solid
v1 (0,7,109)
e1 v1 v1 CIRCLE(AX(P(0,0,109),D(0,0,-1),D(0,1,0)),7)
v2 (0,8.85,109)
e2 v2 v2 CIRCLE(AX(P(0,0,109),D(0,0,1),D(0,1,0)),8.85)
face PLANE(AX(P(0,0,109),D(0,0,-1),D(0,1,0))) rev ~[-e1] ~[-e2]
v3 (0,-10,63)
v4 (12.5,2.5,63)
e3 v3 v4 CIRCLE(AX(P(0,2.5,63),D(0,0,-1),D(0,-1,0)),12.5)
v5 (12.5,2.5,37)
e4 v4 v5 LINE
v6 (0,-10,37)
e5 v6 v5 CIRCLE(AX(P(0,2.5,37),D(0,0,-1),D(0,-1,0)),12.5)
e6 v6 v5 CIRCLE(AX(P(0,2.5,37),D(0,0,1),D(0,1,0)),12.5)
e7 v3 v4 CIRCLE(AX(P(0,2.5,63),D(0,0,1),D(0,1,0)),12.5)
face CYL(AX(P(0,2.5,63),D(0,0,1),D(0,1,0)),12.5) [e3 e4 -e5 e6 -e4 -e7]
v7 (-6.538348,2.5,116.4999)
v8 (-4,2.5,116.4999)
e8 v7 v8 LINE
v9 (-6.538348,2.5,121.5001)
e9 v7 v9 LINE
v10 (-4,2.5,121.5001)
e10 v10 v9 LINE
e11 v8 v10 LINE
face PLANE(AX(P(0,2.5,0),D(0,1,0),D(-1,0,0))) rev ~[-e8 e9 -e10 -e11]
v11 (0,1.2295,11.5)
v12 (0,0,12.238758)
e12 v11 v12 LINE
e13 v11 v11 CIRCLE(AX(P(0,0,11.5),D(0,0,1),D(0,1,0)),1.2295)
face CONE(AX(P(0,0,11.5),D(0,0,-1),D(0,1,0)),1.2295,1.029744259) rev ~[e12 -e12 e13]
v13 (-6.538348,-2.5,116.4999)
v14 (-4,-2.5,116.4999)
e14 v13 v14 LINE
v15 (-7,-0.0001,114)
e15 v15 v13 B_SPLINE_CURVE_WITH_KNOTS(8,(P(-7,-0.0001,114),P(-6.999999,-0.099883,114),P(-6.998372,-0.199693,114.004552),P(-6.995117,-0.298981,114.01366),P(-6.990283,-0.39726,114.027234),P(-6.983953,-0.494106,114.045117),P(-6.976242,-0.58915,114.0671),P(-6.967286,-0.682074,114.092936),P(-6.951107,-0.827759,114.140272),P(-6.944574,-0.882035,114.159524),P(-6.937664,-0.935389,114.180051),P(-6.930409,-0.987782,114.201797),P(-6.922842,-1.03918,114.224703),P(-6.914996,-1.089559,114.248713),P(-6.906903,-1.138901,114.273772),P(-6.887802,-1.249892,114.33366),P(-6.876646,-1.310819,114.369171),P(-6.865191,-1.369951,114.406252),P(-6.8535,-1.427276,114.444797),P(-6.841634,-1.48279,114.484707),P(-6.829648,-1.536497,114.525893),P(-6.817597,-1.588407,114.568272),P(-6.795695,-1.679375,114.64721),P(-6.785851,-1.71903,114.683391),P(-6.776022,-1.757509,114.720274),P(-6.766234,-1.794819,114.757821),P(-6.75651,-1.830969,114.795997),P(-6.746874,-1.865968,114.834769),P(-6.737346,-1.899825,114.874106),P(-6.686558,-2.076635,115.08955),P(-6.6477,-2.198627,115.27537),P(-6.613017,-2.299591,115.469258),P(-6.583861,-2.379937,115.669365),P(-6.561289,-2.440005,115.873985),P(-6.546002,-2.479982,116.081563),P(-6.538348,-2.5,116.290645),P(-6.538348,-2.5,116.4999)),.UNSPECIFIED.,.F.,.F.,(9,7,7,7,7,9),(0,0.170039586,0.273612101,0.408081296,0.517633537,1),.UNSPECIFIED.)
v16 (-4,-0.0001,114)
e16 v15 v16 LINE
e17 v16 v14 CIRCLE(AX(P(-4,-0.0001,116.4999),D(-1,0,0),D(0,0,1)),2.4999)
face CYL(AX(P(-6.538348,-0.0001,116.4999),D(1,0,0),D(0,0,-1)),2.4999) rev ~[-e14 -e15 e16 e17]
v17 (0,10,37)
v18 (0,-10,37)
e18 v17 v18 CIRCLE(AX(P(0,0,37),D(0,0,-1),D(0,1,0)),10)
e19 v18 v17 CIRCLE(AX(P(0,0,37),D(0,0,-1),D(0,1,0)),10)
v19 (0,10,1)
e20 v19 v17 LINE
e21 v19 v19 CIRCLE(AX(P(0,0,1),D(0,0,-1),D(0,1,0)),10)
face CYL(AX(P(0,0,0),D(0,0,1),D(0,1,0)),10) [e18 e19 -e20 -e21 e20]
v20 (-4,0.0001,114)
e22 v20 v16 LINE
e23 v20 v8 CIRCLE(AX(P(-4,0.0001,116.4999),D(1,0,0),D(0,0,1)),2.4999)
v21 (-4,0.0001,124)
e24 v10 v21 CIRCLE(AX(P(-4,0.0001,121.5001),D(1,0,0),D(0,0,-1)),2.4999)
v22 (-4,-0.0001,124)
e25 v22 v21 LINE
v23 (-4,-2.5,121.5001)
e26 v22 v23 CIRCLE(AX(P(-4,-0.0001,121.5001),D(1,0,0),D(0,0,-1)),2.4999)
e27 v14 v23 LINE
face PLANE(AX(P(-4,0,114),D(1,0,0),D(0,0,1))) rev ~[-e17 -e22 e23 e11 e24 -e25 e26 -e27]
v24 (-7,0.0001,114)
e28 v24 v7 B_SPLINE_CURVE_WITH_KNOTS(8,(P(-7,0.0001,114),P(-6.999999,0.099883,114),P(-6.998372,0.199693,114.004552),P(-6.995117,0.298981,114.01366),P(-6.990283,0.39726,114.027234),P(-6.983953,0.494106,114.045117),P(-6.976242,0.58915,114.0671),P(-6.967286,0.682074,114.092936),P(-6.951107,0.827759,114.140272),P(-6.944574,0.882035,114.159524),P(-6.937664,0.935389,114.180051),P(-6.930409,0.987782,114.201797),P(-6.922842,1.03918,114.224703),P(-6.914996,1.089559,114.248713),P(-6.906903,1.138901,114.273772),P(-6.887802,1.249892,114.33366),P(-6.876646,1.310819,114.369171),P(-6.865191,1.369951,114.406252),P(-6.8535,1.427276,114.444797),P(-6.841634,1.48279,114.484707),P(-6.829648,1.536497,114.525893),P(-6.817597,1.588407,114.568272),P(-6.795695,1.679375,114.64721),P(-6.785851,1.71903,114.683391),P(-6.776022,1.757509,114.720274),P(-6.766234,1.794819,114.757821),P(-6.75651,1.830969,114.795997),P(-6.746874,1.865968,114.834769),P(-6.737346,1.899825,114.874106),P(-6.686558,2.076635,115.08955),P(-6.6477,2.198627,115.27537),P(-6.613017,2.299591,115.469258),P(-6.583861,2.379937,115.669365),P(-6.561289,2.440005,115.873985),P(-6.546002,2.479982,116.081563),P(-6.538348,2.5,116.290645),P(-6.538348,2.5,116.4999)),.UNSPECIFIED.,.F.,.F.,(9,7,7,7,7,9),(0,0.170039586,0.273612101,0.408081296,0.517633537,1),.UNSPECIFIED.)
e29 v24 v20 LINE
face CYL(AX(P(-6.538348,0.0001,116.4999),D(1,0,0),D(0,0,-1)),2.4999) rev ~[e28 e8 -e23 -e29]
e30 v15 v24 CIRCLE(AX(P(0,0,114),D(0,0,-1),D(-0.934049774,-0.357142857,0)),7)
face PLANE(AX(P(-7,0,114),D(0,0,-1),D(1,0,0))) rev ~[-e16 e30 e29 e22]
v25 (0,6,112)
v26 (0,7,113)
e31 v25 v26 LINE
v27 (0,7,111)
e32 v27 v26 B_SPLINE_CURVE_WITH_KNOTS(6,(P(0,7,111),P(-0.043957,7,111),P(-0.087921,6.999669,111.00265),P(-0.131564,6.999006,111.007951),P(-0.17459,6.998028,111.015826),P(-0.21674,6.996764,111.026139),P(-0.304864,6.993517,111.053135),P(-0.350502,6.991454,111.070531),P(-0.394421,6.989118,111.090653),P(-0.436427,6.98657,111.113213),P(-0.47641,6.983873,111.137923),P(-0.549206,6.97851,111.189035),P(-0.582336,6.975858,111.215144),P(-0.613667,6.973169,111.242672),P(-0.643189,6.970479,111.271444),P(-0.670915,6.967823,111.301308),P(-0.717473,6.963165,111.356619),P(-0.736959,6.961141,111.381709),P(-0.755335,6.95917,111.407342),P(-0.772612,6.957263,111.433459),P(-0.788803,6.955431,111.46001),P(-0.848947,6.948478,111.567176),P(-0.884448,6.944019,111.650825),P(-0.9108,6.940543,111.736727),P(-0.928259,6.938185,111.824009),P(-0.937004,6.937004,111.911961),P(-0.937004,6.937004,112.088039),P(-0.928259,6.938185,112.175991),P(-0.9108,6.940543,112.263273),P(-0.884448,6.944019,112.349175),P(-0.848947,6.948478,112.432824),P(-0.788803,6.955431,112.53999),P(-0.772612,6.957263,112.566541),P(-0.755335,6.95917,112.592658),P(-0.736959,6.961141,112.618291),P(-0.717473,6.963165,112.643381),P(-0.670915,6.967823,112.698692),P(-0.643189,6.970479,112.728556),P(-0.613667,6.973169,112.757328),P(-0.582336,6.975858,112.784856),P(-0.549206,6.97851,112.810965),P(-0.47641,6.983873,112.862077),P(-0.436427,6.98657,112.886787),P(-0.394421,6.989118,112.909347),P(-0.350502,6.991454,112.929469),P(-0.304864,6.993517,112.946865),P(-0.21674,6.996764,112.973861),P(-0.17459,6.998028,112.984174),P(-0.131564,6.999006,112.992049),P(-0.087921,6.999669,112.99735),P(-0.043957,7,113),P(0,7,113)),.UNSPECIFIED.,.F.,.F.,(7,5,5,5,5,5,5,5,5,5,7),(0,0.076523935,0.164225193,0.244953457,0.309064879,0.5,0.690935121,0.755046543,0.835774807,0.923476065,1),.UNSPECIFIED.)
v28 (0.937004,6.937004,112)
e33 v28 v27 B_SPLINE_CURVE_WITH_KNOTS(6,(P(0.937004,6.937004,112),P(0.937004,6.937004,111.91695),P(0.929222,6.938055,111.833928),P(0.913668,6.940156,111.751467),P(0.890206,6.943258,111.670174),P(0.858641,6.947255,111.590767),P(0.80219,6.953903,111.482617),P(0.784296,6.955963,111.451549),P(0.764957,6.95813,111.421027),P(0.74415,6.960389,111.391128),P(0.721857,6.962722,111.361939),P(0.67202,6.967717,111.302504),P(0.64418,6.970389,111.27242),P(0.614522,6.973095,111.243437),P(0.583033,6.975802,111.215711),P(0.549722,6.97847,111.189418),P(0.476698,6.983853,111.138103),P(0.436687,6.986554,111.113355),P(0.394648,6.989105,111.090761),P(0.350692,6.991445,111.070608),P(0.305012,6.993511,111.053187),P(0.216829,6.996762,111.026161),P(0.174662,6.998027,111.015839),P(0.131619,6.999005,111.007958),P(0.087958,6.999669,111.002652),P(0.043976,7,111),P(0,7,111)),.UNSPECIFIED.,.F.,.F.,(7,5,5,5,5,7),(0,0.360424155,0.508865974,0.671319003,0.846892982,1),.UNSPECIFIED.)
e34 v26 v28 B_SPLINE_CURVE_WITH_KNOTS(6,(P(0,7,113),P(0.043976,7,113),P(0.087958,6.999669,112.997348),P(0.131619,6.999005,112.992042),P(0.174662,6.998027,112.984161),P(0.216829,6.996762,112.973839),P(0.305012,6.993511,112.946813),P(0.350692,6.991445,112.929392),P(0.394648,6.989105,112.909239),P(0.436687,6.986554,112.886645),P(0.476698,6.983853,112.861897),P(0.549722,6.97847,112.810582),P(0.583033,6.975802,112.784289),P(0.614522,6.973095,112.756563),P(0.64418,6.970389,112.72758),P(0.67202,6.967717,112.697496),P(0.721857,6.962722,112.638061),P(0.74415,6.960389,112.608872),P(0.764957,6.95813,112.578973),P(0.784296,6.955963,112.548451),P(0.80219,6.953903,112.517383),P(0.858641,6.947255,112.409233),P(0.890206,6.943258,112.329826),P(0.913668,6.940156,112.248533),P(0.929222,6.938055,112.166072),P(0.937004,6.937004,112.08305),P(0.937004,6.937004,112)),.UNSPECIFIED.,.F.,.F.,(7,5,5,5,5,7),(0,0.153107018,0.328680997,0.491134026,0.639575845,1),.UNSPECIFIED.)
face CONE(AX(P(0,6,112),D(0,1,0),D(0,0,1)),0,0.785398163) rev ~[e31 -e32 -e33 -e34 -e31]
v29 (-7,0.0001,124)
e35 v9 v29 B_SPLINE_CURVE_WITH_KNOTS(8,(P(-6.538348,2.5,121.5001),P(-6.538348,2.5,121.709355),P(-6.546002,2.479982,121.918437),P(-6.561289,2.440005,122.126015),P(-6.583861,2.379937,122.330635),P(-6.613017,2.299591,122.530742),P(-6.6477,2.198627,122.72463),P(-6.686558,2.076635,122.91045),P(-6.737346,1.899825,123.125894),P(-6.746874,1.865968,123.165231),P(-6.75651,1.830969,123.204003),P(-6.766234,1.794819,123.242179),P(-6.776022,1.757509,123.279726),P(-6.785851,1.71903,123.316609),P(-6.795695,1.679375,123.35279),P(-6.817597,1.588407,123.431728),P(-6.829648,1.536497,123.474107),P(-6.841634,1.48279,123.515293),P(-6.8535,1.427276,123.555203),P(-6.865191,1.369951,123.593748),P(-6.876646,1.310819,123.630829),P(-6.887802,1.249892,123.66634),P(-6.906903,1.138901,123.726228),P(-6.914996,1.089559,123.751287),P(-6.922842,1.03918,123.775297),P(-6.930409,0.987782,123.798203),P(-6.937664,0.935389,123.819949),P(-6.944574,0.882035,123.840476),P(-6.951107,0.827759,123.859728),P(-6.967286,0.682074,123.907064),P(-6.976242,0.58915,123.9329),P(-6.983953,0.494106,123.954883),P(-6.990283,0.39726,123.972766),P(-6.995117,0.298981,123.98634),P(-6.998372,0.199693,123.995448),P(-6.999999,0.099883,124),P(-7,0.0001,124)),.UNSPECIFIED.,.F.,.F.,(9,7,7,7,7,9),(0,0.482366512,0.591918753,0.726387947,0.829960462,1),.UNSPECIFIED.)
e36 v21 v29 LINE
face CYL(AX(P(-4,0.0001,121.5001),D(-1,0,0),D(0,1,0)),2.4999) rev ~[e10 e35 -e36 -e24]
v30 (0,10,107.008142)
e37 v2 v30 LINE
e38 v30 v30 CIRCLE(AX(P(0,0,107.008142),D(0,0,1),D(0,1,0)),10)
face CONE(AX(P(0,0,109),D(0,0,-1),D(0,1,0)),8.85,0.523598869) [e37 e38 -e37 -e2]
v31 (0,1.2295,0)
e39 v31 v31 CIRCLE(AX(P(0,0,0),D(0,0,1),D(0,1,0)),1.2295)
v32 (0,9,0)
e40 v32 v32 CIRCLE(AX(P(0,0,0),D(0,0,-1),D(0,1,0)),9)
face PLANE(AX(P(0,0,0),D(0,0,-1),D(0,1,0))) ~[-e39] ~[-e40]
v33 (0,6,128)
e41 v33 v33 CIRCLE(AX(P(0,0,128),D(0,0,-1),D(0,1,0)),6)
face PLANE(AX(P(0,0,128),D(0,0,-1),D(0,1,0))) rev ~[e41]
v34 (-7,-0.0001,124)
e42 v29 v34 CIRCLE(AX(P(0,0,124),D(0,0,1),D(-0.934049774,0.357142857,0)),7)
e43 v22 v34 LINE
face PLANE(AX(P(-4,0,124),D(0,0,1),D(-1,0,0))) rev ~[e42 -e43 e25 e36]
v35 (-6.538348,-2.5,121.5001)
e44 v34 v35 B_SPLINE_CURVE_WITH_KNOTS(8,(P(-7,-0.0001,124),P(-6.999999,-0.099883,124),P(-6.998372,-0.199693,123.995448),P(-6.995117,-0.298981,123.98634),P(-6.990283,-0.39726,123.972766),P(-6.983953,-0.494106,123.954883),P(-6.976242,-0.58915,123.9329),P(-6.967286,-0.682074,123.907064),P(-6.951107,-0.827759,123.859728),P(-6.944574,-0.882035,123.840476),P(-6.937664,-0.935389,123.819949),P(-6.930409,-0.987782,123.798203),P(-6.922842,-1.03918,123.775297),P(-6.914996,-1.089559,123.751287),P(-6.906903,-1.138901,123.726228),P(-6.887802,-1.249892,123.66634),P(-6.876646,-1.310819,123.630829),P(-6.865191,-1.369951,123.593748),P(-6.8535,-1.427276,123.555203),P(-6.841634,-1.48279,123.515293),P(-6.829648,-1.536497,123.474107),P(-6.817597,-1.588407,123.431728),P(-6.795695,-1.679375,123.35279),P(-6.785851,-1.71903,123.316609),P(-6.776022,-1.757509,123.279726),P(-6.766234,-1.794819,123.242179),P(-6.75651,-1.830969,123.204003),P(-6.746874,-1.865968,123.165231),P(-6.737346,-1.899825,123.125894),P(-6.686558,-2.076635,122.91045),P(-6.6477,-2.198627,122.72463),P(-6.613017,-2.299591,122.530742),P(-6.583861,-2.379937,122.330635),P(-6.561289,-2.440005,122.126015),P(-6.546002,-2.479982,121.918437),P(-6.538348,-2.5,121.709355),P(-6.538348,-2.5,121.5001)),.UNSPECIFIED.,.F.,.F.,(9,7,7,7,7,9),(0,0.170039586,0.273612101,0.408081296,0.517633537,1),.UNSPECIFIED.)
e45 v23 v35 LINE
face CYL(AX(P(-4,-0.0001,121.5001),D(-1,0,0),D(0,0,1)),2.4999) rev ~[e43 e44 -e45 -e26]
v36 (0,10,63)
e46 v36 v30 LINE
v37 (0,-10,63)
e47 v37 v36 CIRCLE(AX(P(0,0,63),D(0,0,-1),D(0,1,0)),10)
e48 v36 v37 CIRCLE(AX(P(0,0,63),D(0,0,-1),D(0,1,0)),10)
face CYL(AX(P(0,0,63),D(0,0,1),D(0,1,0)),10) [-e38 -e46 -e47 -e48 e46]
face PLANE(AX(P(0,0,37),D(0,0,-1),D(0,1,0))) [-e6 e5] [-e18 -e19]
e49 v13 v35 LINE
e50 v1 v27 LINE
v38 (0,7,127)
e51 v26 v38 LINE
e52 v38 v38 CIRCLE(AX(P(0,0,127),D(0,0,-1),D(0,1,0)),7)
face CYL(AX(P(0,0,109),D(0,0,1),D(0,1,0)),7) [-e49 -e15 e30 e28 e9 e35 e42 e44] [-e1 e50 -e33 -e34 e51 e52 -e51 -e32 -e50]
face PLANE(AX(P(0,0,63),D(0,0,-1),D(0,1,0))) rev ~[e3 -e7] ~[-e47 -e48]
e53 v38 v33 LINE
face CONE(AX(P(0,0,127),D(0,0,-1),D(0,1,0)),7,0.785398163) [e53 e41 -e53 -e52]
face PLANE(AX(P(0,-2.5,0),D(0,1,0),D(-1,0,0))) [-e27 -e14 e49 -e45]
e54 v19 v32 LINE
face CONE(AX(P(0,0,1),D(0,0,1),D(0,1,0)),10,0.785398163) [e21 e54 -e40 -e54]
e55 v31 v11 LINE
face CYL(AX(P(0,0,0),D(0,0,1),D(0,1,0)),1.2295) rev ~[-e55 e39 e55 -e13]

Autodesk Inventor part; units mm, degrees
ref_plane "YZ Plane" through (0, 0, 0) normal (1, 0, 0) x (0, 1, 0)
ref_plane "XZ Plane" through (0, 0, 0) normal (0, 1, 0) x (-1, 0, 0)
ref_plane "XY Plane" through (0, 0, 0) normal (0, 0, 1) x (1, 0, 0)
sketch "스케치1" plane through (0, 0, 0) normal (1, 0, 0) x (0, 1, 0)
  line L0 (0, 0) -> (10, 0)
  line L1 (10, 0) -> (10, 37)
  line L2 (10, 37) -> (0, 37)
  line L3 (0, 37) -> (0, 0)
  line L4 (0, 37) -> (15, 37)
  line L5 (15, 37) -> (15, 63)
  line L6 (15, 63) -> (0, 63)
  line L7 (0, 63) -> (0, 37)
  line L8 (0, 63) -> (10, 63)
  line L9 (10, 63) -> (10, 109)
  line L10 (10, 109) -> (0, 109)
  line L11 (0, 109) -> (0, 63)
  line L12 (0, 109) -> (7, 109)
  line L13 (7, 109) -> (7, 128)
  line L14 (7, 128) -> (0, 128)
  line L15 (0, 128) -> (0, 109)
  dimension "d1" = 37
  dimension "d2" = 26
  dimension "d3" = 46
  dimension "d4" = 20
  dimension "d5" = 30
  dimension "d6" = 19
  dimension "d7" = 14
revolve "회전1" add sketch "스케치1" angle 360 about axis through (0, 0, 63) along (0, 0, -1)
sketch "스케치2" plane through (0, 0, 63) normal (0, 0, 1) x (1, 0, 0)
  circle A0 centre (0, 0) radius 10 projected
  circle A1 centre (0, 2.5) radius 12.5
  circle A2 centre (0, 0) radius 15 projected
  point P0 (0, 0)
  dimension "d9" = 25
sketch "스케치2 outline for 돌출1" plane through (0, 0, 63) normal (0, 0, 1) x (1, 0, 0)
  arc A0 (0, 15) -> (15, 0) centre (0, 0) ccw
  arc A1 (15, 0) -> (0, 15) centre (0, 0) ccw
  arc A2 (0, 15) -> (12.5, 2.5) centre (0, 2.5) ccw
  arc A3 (12.5, 2.5) -> (0, 15) centre (0, 2.5) ccw
extrude "돌출1" cut sketch "스케치2 outline for 돌출1" against normal up to next
sketch "스케치3" plane through (0, 0, 0) normal (1, 0, 0) x (0, 1, 0)
  line L0 (10, 109) -> (10, 63)
  line L1 (-10, 109) -> (10, 109)
  line L2 (10, 109) -> (10, 107.008142)
  line L3 (8.85, 109) -> (10, 109)
  line L4 (8.85, 109) -> (10, 107.008142)
  line L5 (0, -21.8) -> (0, 130.8)
  point P0 (0, 0)
  dimension "d12" = 30
  dimension "d13" = 1.15
revolve "회전2" cut sketch "스케치3" angle 360 about axis through (0, 0, -10) along (0, 0, 1)
sketch "스케치4" plane through (0, 0, 0) normal (0, 0, -1) x (-1, 0, 0)
  circle A0 centre (0, 0) radius 1.5
  dimension "d15" = 3
hole "구멍1" at (0, 0, 0) direction (0, 0, 1) diameter 2.459 depth 11.5 tip angle 118 thread size "M3x0.5" class "6H" standard "ANSI Metric M Profile"
sketch "스케치6" plane through (0, 0, 0) normal (0, 1, 0) x (-1, 0, 0)
  line L0 (7, 128) -> (7, 109) projected
  line L1 (7, 114) -> (4, 114)
  line L2 (4, 114) -> (4, 124)
  line L3 (4, 124) -> (7, 124)
  line L4 (7, 114) -> (7, 124)
  point P0 (0, 0)
  dimension "d29" = 4
  dimension "d30" = 10
  dimension "d31" = 3
extrude "돌출3" cut sketch "스케치6" along normal mid plane 5
fillet "모깎기2" radius 2.5 4 edges at (-5.2692, 2.5, 114) (-5.2692, -2.5, 114) (-5.2692, 2.5, 124) (-5.2692, -2.5, 124)
sketch "스케치8" plane through (0, 0, 0) normal (1, 0, 0) x (0, 1, 0)
  line L0 (7, 128) -> (7, 109) projected
  line L1 (7, 112) -> (6, 112)
  line L2 (6, 112) -> (7, 113)
  line L3 (7, 112) -> (7, 113)
  point P0 (0, 0)
  dimension "d35" = 45
  dimension "d36" = 1
  dimension "d37" = 3
revolve "회전3" cut sketch "스케치8" angle 360 about axis through (0, 7, 112) along (0, -1, 0)
chamfer "모따기1" distance 1 angle 45 2 edges at (0, -7, 128) (0, -10, 0)
properties part number "도면2-4번"
